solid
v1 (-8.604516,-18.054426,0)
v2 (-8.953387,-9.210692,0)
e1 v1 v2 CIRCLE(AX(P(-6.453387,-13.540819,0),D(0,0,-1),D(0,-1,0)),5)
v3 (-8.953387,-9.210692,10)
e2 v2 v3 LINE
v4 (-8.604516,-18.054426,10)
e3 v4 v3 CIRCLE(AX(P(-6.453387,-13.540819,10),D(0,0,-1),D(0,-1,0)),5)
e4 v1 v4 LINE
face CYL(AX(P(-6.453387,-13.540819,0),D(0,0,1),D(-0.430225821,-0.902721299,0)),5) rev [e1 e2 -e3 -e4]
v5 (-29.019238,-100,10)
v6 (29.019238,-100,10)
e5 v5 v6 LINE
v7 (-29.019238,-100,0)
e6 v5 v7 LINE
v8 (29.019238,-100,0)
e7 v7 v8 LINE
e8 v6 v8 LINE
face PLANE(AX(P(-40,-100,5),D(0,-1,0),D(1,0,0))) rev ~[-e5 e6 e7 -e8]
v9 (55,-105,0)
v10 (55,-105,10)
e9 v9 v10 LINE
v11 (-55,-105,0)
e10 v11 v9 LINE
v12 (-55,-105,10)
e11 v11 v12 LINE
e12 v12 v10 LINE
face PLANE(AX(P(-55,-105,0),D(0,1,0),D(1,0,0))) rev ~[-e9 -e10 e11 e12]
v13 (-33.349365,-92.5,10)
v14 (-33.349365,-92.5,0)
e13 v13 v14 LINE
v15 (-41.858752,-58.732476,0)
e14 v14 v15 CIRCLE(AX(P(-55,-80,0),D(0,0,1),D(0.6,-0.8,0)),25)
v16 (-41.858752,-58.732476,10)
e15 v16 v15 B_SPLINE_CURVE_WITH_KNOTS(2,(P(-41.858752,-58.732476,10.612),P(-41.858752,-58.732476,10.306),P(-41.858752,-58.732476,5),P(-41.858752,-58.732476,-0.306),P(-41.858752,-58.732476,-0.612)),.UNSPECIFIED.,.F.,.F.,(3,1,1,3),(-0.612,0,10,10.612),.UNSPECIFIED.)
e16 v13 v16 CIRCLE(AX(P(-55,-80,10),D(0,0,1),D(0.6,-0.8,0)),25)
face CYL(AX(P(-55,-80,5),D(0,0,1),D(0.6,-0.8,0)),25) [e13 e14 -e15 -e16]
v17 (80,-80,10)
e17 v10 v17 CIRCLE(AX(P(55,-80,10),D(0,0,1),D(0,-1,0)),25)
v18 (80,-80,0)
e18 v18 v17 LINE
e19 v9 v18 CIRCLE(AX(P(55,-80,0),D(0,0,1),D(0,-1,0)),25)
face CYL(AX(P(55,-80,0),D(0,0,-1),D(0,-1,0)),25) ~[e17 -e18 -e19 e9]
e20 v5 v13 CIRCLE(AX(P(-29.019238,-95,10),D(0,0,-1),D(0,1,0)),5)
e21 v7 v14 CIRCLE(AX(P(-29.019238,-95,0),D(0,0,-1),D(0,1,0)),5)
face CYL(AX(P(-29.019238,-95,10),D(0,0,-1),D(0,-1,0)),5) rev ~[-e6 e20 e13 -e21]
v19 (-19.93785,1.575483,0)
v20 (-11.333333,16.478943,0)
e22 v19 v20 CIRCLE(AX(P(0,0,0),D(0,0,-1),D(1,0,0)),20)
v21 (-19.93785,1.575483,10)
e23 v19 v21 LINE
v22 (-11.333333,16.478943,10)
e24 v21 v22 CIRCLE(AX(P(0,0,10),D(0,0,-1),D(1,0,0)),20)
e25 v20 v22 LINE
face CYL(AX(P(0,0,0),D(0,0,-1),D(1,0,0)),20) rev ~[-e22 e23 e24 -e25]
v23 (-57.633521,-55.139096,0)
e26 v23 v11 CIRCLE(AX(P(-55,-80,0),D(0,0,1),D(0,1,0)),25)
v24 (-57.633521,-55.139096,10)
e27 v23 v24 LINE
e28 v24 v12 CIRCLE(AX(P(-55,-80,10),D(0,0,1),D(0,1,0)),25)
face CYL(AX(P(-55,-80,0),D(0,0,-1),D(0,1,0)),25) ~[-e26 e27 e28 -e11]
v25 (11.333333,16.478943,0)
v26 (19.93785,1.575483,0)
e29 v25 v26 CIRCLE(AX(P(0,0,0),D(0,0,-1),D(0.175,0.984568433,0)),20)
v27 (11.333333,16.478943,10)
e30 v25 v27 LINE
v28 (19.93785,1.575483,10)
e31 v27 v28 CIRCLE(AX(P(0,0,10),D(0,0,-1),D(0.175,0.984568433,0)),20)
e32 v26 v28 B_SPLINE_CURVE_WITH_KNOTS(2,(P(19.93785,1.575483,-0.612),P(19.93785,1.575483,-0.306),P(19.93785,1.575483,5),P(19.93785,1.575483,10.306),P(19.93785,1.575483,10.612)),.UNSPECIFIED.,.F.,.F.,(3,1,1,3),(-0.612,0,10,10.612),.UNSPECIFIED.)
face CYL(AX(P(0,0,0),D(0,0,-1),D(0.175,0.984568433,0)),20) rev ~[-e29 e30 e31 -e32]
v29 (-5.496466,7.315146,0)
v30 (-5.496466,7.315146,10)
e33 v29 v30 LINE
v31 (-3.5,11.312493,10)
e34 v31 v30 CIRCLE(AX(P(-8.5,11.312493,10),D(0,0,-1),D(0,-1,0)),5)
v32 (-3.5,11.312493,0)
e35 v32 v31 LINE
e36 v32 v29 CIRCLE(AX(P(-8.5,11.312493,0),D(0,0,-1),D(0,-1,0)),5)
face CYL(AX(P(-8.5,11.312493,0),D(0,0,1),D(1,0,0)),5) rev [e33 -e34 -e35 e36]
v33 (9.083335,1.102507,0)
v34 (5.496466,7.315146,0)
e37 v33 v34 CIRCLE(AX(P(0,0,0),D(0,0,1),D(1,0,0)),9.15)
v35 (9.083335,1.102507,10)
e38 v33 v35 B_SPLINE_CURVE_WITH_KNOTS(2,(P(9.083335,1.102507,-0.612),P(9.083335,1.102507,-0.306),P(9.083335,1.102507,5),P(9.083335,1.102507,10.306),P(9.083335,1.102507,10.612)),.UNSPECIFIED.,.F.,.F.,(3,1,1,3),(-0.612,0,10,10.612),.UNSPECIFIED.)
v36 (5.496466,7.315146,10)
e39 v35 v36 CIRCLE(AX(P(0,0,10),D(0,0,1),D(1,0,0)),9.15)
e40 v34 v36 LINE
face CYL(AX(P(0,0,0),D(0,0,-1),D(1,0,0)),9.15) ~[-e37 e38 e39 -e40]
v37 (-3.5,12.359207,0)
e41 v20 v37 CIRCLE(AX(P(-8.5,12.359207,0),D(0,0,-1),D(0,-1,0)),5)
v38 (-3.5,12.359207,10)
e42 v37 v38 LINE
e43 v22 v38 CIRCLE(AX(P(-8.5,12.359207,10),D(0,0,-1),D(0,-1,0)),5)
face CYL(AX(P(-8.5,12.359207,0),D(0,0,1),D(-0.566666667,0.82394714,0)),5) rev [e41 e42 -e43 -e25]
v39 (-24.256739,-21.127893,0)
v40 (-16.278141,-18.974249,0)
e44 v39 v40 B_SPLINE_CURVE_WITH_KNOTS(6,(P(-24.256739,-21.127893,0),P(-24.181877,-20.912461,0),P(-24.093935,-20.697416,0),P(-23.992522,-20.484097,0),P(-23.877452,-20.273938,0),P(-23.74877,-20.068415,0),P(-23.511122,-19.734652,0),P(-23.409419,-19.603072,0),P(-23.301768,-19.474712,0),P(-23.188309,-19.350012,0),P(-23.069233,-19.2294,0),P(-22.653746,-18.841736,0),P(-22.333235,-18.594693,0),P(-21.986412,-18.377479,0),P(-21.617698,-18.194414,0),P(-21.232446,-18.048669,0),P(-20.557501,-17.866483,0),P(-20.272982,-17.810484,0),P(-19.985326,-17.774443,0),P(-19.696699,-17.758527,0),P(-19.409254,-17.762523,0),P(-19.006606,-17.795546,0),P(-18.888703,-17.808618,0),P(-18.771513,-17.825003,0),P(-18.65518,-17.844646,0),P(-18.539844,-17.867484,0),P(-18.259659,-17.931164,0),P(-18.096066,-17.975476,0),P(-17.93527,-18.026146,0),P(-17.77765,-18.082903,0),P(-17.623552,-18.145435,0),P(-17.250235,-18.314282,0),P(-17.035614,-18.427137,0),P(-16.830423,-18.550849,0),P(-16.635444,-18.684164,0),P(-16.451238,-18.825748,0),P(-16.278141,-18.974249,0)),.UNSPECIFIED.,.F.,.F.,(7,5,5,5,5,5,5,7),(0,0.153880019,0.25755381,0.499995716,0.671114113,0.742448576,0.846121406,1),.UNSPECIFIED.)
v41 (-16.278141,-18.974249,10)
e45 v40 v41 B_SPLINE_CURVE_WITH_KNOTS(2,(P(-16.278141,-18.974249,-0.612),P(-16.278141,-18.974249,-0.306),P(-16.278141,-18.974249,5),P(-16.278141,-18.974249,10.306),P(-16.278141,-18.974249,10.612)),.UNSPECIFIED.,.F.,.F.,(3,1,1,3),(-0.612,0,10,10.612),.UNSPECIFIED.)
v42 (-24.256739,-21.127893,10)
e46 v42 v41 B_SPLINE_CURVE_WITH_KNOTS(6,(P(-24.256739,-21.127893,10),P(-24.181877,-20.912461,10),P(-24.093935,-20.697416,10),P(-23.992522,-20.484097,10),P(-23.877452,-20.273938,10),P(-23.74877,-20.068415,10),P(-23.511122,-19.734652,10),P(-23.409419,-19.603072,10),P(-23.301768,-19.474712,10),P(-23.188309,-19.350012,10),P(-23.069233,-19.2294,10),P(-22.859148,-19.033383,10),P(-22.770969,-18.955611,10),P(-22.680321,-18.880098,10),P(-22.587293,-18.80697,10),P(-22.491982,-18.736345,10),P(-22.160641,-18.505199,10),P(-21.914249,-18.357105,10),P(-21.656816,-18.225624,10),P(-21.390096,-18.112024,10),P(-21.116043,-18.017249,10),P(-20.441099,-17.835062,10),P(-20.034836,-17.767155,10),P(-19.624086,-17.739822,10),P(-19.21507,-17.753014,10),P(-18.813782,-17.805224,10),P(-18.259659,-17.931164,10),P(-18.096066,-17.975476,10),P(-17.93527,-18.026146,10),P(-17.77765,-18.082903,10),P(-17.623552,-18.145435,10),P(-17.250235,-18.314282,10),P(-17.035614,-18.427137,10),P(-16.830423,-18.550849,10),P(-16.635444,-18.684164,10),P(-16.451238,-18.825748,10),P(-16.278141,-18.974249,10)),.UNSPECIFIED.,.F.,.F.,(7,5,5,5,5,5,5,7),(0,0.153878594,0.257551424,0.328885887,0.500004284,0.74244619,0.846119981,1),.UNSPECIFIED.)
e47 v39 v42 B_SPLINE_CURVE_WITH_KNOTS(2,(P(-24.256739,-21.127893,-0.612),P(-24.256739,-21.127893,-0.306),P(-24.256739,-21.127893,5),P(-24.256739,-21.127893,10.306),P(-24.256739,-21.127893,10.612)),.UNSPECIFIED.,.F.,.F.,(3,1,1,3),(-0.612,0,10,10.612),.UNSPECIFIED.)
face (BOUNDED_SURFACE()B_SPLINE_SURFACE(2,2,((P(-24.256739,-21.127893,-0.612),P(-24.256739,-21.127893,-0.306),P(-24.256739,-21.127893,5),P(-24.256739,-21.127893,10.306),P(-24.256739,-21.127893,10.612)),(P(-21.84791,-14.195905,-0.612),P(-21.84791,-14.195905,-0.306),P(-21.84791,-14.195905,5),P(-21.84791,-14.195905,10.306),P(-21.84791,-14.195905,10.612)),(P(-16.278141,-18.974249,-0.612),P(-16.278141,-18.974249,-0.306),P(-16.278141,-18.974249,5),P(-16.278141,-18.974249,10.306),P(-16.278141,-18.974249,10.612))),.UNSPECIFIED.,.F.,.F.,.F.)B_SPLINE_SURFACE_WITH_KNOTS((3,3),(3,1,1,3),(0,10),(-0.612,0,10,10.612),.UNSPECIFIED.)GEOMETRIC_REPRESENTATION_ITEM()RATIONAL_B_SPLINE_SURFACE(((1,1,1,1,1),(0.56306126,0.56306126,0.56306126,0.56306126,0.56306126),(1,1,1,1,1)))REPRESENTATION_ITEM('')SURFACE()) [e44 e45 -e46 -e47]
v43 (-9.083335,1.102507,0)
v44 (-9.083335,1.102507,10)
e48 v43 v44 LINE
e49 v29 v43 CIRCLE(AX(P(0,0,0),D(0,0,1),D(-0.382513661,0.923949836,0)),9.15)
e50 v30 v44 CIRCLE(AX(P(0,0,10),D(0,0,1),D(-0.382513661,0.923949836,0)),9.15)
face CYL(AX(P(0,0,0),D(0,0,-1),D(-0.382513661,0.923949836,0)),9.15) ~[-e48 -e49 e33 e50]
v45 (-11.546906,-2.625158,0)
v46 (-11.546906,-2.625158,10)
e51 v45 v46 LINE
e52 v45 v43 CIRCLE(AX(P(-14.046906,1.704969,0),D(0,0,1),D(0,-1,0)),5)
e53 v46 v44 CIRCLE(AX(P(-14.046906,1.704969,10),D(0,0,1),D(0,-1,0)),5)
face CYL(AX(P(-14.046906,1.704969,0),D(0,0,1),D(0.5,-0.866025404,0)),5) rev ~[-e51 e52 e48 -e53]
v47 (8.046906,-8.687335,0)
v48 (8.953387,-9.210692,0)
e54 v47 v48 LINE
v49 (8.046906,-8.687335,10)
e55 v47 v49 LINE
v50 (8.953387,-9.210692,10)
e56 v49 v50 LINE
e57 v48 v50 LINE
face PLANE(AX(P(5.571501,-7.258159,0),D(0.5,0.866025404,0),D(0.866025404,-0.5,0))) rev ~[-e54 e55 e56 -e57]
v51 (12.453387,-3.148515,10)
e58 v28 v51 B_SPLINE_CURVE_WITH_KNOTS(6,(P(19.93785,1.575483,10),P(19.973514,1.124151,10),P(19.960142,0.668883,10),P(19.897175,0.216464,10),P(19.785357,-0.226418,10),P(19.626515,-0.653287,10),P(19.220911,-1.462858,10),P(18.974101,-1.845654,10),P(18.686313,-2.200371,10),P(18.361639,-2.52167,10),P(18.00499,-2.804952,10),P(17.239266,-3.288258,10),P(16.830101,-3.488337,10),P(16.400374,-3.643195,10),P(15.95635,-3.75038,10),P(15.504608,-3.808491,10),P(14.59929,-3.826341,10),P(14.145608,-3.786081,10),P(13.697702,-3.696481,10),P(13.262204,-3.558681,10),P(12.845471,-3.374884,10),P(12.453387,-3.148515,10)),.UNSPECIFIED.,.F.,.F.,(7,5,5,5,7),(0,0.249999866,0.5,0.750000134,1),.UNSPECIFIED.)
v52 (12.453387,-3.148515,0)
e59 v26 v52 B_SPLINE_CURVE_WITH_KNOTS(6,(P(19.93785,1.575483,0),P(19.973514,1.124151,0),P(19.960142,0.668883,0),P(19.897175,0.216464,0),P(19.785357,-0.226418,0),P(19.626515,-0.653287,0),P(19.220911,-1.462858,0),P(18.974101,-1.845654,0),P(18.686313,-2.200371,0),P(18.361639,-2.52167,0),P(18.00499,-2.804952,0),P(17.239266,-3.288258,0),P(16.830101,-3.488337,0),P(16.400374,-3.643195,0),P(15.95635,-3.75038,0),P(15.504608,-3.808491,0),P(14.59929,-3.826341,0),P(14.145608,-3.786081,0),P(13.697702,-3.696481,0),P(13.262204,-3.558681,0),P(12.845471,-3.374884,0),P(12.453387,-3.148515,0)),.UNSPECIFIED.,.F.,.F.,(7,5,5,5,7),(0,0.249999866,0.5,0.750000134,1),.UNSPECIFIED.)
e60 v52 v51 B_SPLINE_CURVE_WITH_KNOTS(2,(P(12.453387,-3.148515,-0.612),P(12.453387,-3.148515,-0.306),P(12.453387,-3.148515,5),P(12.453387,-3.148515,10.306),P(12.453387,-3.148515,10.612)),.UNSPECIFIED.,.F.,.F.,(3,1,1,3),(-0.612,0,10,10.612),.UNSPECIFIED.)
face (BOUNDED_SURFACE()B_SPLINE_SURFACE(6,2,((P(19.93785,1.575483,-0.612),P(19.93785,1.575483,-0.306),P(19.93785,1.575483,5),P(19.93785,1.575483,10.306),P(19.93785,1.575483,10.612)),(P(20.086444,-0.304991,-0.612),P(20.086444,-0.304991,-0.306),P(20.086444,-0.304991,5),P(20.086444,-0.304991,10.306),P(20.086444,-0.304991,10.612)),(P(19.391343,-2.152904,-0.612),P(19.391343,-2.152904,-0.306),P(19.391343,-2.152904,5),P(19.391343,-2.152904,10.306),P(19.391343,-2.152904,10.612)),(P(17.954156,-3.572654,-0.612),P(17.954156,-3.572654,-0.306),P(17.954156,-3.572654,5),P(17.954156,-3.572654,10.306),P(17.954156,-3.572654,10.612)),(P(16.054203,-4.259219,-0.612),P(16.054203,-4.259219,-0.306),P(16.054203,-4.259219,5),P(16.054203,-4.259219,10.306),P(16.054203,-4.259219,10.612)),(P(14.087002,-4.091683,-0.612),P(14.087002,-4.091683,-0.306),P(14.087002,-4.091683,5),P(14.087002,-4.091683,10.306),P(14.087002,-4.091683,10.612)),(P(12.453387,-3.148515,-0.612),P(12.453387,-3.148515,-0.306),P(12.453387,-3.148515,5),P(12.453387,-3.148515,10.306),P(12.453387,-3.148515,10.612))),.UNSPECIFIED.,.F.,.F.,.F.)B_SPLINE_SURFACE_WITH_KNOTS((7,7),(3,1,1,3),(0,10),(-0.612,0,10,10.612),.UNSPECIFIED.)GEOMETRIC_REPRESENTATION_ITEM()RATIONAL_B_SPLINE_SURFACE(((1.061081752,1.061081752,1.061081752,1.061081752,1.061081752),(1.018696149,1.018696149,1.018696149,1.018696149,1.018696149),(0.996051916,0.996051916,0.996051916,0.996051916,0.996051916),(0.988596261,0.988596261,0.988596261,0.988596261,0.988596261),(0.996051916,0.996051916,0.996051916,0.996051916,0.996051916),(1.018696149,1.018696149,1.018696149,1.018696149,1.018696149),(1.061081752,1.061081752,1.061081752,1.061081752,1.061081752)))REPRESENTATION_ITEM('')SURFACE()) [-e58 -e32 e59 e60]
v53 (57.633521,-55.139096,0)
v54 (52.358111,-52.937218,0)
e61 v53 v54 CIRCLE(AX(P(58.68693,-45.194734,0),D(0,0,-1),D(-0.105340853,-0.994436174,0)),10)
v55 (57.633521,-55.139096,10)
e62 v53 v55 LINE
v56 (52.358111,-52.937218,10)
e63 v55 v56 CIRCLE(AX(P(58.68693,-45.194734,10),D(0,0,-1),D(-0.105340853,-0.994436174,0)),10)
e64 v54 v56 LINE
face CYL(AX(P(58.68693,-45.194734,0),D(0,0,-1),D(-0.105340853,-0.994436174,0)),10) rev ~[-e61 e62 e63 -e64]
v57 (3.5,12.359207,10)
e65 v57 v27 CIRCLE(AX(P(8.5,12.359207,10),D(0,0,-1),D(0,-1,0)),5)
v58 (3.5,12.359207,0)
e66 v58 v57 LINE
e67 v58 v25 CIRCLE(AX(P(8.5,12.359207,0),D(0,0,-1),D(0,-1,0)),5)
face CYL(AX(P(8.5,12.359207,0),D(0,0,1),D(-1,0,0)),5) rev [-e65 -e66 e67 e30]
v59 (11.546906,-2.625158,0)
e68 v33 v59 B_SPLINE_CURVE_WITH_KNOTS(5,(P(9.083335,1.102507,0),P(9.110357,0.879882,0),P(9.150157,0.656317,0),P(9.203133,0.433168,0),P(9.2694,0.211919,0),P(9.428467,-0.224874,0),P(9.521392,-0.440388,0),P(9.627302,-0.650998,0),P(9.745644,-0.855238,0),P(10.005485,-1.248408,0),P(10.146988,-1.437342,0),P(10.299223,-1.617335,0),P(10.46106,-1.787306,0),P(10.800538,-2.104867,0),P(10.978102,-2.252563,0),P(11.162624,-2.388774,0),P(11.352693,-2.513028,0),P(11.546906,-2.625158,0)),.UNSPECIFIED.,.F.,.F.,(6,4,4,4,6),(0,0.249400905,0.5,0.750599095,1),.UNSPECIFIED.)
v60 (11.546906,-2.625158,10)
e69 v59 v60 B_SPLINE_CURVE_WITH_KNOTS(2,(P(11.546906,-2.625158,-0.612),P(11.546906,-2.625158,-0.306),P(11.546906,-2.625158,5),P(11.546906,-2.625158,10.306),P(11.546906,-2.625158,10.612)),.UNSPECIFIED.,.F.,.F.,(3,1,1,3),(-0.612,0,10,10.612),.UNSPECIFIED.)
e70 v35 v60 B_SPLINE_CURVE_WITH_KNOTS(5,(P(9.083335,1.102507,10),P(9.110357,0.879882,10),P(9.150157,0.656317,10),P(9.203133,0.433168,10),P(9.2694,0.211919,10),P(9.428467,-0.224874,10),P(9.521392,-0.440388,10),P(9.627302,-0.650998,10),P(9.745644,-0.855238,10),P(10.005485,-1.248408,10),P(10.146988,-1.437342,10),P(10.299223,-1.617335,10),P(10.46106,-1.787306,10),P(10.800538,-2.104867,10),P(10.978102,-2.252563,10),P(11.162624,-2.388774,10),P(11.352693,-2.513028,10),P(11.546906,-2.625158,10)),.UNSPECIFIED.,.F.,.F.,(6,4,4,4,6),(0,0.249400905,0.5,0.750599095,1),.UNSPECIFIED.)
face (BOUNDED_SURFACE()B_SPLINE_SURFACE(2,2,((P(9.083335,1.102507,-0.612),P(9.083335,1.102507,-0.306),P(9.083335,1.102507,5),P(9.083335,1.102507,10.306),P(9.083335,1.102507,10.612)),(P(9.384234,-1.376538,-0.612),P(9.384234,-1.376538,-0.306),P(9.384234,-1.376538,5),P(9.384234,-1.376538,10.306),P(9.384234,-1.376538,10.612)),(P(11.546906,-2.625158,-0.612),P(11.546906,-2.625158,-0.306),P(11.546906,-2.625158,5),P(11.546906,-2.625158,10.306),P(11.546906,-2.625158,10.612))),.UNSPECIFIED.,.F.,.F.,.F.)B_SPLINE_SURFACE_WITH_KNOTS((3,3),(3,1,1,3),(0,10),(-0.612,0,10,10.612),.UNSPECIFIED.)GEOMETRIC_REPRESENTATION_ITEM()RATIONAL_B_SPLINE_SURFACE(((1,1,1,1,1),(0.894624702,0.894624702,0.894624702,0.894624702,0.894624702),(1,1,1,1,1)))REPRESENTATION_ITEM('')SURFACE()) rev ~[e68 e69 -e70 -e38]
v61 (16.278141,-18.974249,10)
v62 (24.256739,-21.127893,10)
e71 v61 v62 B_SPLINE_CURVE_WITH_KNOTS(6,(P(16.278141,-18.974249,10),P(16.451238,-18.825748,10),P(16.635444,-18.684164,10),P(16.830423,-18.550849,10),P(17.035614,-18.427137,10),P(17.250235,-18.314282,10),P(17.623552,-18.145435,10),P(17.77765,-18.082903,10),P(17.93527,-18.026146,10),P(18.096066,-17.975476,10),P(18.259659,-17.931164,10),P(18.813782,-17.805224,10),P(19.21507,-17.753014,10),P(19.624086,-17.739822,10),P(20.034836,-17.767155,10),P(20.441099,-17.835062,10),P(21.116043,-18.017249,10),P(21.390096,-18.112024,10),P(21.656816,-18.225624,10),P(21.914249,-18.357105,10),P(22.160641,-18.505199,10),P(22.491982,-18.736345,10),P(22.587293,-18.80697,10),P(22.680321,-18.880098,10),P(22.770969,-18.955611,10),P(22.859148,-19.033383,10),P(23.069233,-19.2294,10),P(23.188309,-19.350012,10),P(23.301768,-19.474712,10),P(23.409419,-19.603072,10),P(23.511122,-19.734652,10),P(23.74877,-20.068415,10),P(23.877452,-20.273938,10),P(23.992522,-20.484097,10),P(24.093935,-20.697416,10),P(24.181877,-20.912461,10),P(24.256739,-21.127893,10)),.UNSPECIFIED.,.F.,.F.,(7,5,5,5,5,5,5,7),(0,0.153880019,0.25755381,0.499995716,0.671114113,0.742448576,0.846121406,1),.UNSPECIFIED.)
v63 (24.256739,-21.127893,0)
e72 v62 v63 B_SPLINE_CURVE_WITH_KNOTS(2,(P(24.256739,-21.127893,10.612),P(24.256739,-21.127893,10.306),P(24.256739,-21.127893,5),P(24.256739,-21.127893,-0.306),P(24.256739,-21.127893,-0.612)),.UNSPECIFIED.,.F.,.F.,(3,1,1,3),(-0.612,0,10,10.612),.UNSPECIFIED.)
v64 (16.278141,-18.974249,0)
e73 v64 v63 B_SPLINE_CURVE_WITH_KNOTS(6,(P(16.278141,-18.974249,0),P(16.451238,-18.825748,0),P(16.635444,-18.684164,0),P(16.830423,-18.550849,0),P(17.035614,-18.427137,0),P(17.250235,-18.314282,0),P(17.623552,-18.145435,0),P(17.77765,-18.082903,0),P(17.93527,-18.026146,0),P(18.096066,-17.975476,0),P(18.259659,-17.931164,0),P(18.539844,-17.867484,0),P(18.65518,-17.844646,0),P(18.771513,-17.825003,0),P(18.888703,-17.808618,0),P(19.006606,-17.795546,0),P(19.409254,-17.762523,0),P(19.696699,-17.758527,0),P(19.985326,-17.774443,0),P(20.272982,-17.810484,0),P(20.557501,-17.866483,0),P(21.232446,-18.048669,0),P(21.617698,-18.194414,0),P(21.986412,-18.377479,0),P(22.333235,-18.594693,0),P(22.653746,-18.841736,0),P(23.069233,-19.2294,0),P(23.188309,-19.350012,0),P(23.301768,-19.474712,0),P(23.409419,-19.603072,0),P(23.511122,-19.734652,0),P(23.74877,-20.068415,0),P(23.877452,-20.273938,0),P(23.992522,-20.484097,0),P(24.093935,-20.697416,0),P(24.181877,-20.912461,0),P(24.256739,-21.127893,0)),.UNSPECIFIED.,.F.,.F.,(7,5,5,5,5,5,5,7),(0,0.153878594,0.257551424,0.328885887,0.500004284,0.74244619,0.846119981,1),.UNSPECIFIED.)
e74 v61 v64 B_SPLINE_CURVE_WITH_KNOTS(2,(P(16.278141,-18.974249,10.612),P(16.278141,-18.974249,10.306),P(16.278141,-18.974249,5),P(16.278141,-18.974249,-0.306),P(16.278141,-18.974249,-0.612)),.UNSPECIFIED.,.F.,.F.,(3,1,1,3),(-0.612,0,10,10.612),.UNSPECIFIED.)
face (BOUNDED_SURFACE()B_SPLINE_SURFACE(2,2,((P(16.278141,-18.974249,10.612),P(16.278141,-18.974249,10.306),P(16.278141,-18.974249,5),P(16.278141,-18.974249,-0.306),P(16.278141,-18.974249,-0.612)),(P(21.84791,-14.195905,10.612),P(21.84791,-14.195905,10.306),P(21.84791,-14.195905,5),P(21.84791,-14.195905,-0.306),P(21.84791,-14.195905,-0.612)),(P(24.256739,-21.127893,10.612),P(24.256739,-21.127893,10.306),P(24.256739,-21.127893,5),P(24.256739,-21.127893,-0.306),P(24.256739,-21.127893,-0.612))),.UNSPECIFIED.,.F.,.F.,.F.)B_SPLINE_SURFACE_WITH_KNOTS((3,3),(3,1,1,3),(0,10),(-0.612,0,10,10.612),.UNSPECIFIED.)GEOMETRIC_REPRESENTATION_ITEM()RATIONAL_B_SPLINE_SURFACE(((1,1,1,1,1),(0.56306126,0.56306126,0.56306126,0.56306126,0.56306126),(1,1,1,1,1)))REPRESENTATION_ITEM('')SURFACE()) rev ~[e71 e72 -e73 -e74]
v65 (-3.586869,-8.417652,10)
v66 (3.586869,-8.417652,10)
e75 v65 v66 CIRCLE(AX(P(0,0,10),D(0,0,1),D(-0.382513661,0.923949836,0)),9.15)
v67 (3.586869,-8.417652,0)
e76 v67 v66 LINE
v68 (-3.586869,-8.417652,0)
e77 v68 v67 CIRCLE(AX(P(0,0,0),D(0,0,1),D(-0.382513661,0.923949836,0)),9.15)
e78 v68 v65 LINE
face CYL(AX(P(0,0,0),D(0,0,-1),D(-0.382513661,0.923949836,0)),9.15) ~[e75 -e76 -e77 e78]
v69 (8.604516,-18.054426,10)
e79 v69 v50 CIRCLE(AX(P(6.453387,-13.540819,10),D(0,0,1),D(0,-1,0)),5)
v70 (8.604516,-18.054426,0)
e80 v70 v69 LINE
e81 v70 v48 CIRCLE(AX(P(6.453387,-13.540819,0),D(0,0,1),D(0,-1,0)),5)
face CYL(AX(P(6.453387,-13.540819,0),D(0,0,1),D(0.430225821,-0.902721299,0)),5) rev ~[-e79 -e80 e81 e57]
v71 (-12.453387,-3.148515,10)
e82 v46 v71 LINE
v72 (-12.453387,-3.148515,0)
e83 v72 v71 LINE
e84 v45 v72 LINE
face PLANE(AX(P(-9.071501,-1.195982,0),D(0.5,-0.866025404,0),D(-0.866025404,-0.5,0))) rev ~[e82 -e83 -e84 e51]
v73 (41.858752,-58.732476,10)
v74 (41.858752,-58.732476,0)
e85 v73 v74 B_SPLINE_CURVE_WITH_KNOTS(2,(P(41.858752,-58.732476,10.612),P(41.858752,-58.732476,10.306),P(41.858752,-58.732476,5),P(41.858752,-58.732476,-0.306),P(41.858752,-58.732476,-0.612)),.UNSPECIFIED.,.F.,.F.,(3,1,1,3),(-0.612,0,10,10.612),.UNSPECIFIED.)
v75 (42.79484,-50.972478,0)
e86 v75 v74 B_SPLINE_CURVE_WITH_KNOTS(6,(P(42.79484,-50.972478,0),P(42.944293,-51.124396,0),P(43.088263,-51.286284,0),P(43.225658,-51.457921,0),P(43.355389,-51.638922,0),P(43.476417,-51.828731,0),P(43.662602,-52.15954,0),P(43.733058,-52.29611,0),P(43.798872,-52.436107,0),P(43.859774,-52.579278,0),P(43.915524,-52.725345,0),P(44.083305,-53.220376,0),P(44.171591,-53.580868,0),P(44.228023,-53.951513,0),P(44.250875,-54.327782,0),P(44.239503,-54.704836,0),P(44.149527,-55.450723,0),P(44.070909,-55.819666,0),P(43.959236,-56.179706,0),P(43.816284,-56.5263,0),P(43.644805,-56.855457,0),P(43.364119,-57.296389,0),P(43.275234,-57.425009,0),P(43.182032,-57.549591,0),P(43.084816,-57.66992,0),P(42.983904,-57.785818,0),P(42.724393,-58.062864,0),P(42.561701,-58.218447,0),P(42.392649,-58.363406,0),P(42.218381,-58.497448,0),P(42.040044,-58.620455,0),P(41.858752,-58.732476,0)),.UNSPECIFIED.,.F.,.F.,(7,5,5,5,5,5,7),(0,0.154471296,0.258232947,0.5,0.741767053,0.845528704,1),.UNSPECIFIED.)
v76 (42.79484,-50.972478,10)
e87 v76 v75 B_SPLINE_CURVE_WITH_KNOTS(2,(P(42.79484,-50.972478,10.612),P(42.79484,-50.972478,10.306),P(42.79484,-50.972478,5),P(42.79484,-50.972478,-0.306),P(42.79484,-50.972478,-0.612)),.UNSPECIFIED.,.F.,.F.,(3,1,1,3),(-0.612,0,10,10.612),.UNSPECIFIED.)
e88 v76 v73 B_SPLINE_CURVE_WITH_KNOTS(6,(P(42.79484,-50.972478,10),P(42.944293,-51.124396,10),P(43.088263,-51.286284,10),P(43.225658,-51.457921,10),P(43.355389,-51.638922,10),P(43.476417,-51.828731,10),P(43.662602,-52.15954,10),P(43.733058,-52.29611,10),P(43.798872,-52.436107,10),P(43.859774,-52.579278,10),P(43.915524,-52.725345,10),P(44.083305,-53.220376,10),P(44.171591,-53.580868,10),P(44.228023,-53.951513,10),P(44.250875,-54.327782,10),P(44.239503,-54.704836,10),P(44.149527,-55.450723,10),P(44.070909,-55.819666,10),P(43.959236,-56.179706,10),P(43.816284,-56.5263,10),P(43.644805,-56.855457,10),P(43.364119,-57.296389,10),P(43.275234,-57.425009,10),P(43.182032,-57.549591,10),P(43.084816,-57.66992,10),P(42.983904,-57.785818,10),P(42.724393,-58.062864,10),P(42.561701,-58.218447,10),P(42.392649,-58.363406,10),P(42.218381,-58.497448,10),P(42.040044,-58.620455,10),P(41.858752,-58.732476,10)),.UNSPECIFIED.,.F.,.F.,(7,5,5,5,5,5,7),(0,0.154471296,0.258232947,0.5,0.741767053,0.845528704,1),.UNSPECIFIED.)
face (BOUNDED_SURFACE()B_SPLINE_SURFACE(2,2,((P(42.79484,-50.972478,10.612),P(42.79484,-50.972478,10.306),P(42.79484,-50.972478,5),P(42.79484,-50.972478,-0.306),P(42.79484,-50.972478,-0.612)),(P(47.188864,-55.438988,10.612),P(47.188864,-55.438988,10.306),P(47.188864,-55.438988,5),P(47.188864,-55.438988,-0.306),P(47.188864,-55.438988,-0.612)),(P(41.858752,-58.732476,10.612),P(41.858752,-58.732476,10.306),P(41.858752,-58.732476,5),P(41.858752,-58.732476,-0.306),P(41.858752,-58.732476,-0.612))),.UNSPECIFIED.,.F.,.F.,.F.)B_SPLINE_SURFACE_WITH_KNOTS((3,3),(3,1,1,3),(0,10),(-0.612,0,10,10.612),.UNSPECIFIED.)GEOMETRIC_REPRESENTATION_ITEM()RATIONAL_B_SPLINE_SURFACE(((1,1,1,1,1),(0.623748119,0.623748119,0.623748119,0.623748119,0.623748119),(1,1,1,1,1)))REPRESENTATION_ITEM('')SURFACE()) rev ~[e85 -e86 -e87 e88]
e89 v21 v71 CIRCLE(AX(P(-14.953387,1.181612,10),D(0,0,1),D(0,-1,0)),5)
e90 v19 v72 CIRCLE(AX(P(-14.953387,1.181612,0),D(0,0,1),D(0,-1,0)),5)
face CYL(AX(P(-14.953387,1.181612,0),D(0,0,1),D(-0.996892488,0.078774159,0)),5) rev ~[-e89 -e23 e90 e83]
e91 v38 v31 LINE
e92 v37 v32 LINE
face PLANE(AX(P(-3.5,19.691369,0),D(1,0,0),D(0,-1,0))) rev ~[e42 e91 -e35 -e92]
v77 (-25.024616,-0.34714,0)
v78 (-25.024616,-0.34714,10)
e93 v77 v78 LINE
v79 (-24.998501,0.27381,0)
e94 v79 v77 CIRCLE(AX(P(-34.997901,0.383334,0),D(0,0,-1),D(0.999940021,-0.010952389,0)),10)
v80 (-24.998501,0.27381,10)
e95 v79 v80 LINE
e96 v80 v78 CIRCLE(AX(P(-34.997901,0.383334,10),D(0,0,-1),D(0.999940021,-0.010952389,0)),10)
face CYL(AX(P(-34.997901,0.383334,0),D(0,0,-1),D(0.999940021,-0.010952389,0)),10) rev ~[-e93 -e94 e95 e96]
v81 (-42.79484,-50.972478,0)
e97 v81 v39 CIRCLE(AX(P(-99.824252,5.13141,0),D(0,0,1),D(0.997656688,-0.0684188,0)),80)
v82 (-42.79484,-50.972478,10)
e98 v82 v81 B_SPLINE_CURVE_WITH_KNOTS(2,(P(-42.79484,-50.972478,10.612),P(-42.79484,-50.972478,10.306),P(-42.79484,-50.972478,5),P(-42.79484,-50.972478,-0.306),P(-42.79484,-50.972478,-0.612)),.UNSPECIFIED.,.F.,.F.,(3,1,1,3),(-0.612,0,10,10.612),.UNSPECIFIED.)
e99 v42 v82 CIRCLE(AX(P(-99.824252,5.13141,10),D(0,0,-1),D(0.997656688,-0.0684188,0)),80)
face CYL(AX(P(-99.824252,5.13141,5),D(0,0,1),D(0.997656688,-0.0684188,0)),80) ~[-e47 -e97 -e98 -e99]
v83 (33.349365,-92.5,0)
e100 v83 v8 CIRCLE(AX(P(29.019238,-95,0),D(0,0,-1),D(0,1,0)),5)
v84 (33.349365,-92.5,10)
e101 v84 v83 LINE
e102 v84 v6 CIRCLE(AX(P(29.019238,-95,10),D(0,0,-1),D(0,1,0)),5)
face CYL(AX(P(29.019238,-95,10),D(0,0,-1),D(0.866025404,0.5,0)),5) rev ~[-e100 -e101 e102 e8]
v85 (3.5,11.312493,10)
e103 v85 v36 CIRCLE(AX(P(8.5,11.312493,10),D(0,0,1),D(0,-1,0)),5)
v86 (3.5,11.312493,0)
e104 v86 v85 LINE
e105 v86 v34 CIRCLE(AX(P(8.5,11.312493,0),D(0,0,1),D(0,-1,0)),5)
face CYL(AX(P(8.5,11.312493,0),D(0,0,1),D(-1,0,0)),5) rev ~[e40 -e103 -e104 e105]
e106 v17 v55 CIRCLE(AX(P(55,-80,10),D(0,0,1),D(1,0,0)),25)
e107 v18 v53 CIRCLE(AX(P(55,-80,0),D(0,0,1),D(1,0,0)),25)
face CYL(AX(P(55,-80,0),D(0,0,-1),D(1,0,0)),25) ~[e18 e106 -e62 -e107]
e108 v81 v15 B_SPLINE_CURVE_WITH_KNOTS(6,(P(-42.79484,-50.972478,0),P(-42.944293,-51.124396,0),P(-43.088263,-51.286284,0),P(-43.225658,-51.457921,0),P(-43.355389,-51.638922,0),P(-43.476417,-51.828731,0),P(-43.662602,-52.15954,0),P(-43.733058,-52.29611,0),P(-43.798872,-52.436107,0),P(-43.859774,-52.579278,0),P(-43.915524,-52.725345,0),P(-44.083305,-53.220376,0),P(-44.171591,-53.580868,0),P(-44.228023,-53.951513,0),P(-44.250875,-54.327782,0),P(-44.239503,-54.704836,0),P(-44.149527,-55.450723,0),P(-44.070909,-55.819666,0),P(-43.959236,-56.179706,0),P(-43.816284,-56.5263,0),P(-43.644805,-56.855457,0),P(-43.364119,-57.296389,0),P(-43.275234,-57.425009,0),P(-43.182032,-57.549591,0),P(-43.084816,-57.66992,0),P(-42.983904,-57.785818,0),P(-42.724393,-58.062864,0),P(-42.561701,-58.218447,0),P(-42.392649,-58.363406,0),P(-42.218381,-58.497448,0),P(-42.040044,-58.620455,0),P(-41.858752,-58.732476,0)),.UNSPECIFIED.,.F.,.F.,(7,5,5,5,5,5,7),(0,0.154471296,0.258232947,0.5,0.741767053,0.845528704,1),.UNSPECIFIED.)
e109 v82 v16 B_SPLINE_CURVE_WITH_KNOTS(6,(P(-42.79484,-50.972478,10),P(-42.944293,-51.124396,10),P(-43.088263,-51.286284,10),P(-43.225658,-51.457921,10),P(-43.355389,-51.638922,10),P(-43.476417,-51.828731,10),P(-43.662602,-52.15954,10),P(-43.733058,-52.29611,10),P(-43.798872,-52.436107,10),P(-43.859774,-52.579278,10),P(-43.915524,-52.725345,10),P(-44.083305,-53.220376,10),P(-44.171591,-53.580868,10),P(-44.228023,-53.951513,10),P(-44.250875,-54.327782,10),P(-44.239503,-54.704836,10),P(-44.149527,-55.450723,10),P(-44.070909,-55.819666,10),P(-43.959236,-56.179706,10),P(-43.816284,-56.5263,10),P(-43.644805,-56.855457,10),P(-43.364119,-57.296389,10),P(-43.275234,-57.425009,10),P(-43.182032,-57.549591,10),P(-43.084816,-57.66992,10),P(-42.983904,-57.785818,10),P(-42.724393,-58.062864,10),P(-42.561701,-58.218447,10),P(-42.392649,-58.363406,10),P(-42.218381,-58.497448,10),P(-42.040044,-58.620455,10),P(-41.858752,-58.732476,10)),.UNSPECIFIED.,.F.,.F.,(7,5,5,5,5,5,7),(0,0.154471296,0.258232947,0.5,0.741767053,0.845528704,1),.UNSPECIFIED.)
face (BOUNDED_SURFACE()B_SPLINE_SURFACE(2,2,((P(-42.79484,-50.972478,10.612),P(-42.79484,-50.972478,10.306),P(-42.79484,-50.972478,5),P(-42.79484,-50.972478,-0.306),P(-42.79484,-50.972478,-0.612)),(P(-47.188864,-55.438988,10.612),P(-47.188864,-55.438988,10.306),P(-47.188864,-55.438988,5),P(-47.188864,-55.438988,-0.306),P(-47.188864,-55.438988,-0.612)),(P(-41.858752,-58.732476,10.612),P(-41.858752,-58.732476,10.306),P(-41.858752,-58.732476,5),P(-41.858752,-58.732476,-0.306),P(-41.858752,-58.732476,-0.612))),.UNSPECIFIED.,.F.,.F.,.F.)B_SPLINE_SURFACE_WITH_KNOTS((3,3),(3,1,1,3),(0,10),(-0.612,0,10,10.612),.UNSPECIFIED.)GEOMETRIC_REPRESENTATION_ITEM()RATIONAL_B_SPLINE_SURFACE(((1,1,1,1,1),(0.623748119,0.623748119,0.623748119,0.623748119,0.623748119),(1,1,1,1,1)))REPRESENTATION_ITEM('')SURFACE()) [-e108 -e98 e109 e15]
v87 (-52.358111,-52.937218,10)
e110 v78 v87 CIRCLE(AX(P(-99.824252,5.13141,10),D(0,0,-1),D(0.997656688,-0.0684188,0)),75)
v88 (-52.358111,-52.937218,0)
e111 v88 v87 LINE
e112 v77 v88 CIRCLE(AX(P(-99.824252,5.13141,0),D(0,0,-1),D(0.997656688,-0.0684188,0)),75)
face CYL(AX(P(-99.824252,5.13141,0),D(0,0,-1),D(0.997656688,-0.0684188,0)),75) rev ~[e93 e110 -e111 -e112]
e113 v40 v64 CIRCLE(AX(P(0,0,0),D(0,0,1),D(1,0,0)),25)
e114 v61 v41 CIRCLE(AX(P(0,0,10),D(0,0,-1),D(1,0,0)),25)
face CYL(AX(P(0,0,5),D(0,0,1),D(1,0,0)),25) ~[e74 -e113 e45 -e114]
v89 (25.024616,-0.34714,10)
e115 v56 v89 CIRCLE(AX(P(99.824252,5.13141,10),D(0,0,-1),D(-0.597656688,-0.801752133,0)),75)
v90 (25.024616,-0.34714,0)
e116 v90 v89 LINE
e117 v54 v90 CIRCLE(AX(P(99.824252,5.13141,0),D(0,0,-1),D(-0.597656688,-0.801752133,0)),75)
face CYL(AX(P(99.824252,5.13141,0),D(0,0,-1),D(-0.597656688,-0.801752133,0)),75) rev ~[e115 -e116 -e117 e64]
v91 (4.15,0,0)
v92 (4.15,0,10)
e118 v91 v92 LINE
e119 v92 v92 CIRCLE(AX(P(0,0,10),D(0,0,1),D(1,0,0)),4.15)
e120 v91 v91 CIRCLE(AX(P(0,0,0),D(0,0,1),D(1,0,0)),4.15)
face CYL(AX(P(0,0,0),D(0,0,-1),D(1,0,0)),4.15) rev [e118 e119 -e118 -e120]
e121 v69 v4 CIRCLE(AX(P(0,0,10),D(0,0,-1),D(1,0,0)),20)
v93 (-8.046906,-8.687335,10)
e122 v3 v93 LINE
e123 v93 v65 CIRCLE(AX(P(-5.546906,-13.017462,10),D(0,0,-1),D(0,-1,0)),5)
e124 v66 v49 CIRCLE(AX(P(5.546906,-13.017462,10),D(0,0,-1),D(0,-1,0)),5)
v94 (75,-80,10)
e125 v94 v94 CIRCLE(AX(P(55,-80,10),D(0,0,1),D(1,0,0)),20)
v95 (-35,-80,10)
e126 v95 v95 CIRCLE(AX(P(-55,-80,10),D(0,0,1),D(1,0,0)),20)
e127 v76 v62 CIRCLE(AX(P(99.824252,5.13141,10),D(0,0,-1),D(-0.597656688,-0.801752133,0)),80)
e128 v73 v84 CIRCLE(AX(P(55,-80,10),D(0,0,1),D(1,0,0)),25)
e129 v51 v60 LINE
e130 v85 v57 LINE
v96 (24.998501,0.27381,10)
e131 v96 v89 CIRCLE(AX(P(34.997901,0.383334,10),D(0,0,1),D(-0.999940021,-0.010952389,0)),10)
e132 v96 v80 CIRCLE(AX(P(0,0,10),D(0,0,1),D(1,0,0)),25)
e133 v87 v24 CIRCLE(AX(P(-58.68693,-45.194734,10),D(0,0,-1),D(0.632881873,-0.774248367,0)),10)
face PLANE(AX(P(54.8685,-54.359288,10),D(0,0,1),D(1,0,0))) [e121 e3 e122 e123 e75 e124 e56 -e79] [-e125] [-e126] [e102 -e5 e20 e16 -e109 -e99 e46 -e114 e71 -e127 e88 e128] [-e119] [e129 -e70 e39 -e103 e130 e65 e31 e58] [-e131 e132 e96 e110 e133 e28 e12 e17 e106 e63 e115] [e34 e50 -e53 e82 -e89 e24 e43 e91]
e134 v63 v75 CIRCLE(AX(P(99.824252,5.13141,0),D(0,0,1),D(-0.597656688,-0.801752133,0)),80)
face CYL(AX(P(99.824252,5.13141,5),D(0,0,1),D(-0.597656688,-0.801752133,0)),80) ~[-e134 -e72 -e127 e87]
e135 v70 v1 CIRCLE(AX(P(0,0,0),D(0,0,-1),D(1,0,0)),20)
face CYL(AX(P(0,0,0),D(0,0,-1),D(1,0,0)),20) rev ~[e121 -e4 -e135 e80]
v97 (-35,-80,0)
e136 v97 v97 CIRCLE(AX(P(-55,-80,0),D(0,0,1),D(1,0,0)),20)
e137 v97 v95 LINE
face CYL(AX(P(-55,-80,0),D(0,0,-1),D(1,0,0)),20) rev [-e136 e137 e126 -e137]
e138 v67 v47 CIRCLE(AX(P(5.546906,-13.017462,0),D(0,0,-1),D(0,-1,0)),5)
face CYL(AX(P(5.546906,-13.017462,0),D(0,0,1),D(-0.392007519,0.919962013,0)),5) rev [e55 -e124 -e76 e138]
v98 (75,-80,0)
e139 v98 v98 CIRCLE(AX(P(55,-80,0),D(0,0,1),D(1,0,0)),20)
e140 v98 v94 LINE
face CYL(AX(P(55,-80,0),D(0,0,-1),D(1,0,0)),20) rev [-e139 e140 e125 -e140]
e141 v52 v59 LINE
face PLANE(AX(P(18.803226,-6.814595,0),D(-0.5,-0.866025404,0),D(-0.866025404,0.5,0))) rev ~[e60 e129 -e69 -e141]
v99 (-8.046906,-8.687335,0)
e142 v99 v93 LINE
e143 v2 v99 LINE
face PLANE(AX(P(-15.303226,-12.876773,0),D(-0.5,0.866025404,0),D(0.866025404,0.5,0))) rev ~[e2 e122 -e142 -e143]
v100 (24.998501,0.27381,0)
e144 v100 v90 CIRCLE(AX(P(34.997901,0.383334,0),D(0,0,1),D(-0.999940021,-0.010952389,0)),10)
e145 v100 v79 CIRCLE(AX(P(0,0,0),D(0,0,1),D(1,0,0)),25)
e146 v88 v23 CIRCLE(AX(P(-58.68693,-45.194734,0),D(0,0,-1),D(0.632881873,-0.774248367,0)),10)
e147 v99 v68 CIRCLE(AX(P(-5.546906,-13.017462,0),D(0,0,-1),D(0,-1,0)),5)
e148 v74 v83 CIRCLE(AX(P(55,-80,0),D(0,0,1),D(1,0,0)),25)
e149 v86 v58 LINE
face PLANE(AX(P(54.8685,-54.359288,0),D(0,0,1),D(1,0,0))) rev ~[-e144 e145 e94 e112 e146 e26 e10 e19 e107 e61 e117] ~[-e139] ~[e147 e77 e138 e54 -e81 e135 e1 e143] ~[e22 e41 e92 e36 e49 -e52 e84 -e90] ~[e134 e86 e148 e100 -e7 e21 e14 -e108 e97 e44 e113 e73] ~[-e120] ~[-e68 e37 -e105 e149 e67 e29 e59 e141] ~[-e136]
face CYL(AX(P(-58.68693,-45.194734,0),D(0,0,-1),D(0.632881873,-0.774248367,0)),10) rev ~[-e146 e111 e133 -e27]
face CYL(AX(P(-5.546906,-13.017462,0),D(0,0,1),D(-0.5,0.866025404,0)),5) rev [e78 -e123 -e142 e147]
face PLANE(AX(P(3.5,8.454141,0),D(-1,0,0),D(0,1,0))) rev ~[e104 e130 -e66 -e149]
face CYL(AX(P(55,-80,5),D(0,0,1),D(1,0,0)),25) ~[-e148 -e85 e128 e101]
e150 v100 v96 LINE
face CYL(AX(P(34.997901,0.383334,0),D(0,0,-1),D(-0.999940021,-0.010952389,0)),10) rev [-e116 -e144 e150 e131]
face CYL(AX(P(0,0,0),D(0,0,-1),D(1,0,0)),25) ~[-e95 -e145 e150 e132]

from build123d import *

# Parameters (mm, degrees)
F1_R            = 20
F2_DEPTH        = 10
F3_T            = -5
F4_DEPTH        = 5.001
F1_R_2          = 4.15
F5_DEPTH        = 10
F6_DEPTH        = 10
F6_COPIES_COUNT = 3
F9_R            = 5
F10_T1_DEPTH    = 10
F11_R           = 5


# Not quite as in the source:
# - a fillet or chamfer that OpenCascade refuses, or shapes differently, is made with other operations: its cross-section is extruded or revolved along the edge and cut away or added
# - a feature of the source that left no trace in its solid (it failed there, or was rolled back) is left out
# - a pattern or mirror of a feature is missing from the dataset's text; its kind, count and spacing are read off the source's solid


with BuildPart() as f2:
    # F1 (on Top) → F2 (new body)
    with BuildSketch(Plane.XY):
        with BuildLine():
            ThreePointArc((-25, 0), (0, -25), (25, 0))
            ThreePointArc((25, 0), (0, 25), (-25, 0))
        make_face()
        with BuildLine():
            ThreePointArc((3.5, 19.6913686675), (15.3297097168, 12.8452325787), (20, 0))
            ThreePointArc((20, 0), (-12.8452325787, -15.3297097168), (-3.5, 19.6913686675))
            ThreePointArc((-3.5, 19.6913686675), (0, 20), (3.5, 19.6913686675))
        make_face(mode=Mode.SUBTRACT)
        with BuildLine():
            ThreePointArc((55, -55), (33.982083659, -30.7824998224), (25, 0))
            ThreePointArc((25, 0), (0, -25), (-25, 0))
            ThreePointArc((-25, 0), (-33.982083659, -30.7824998224), (-55, -55))
            ThreePointArc((-55, -55), (-37.3223304703, -62.3223304703), (-30, -80))
            ThreePointArc((-30, -80), (-37.3223304703, -97.6776695297), (-55, -105))
            Line((-55, -105), (55, -105))
            ThreePointArc((55, -105), (30, -80), (55, -55))
        make_face()
        with BuildLine():
            ThreePointArc((80, -80), (72.6776695297, -62.3223304703), (55, -55))
            ThreePointArc((55, -55), (30, -80), (55, -105))
            ThreePointArc((55, -105), (72.6776695297, -97.6776695297), (80, -80))
        make_face()
        with Locations((55, -80)):
            Circle(F1_R, mode=Mode.SUBTRACT)
        with BuildLine():
            ThreePointArc((-30, -80), (-37.3223304703, -62.3223304703), (-55, -55))
            ThreePointArc((-55, -55), (-80, -80), (-55, -105))
            ThreePointArc((-55, -105), (-37.3223304703, -97.6776695297), (-30, -80))
        make_face()
        with Locations((-55, -80)):
            Circle(F1_R, mode=Mode.SUBTRACT)
    extrude(amount=F2_DEPTH)

    # F3
    f3_openings = [f2.faces().sort_by_distance(p)[0] for p in [
        (0, -59.438768, 10),
    ]]
    offset(amount=F3_T, openings=f3_openings)

    # F4 (cut, through all): a face of the model
    f4_faces = [f2.faces().sort_by_distance(p)[0] for p in [
        (0, -60.9945168835, 5),
    ]]
    extrude(f4_faces, amount=-F4_DEPTH, mode=Mode.SUBTRACT)



with BuildPart() as f5:
    # F1 (on Top) → F5 (new body, through all)
    with BuildSketch(Plane.XY):
        with BuildLine():
            ThreePointArc((9.15, 0), (7.6074798718, 5.0841665984), (3.5, 8.4541409972))
            ThreePointArc((3.5, 8.4541409972), (0, 9.15), (-3.5, 8.4541409972))
            ThreePointArc((-3.5, 8.4541409972), (-5.0841665984, -7.6074798718), (9.15, 0))
        make_face()
        Circle(F1_R_2, mode=Mode.SUBTRACT)
    extrude(amount=F5_DEPTH)


with BuildPart() as f2_1:
    add(f2.part)

    add(f5.part)  # F6 merges F5
    # F1 (on Top) → F6 (join, through all)
    with BuildSketch(Plane.XY):
        with BuildLine():
            Line((3.5, 8.4541409972), (3.5, 19.6913686675))
            ThreePointArc((3.5, 19.6913686675), (0, 20), (-3.5, 19.6913686675))
            Line((-3.5, 19.6913686675), (-3.5, 8.4541409972))
            ThreePointArc((-3.5, 8.4541409972), (0, 9.15), (3.5, 8.4541409972))
        make_face()
    f6 = extrude(amount=F6_DEPTH)

    # F6_copies: F6 ×3 about axis
    f6_copies_axis = Axis((0, 0, 0), (0, 0, 1))
    for i in range(1, F6_COPIES_COUNT):
        add(f6.rotate(f6_copies_axis, i * 360 / F6_COPIES_COUNT))

    # F9
    f9_edges = [f2_1.edges().sort_by_distance(p)[0] for p in [
        (3.5, 8.454141, 5),
        (3.5, 19.691369, 5),
        (-3.5, 8.454141, 5),
        (-3.5, 19.691369, 5),
    ]]
    fillet(f9_edges, radius=F9_R)

    # F10: fillet of radius 10 on 4 edges, made by hand

    # F10_s2 → F10_t1 (join)
    with BuildSketch(Plane.XY):
        with BuildLine():
            ThreePointArc((57.6335213289, -55.1390956438), (54.8351268274, -54.4231472749), (52.358111127, -52.9372175751))
            ThreePointArc((52.358111127, -52.9372175751), (53.6675306909, -53.9833691579), (55, -55))
            ThreePointArc((55, -55), (56.3185960515, -55.0347981291), (57.6335213289, -55.1390956438))
        make_face()
        with BuildLine():
            ThreePointArc((-52.358111127, -52.9372175751), (-54.8351268274, -54.4231472749), (-57.6335213289, -55.1390956438))
            ThreePointArc((-57.6335213289, -55.1390956438), (-56.3185960515, -55.0347981291), (-55, -55))
            ThreePointArc((-55, -55), (-53.6675306909, -53.9833691579), (-52.358111127, -52.9372175751))
        make_face()
        with BuildLine():
            ThreePointArc((-24.9985005196, 0.2738097395), (-25.0067330939, -0.0368678872), (-25.0246159735, -0.3471396482))
            ThreePointArc((-25.0246159735, -0.3471396482), (-25.0121066389, -0.1735841019), (-25, 0))
            ThreePointArc((-25, 0), (-24.9996251271, 0.1369069227), (-24.9985005196, 0.2738097395))
        make_face()
        with BuildLine():
            ThreePointArc((24.9985005196, 0.2738097395), (25.0067330939, -0.0368678872), (25.0246159735, -0.3471396482))
            ThreePointArc((25.0246159735, -0.3471396482), (25.0121066389, -0.1735841019), (25, 0))
            ThreePointArc((25, 0), (24.9996251271, 0.1369069227), (24.9985005196, 0.2738097395))
        make_face()
    extrude(amount=F10_T1_DEPTH)

    # F11
    f11_edges = [f2_1.edges().sort_by_distance(p)[0] for p in [
        (9.071501, -1.195982, 5),
        (18.803226, -6.814595, 5),
        (-5.571501, -7.258159, 5),
        (5.571501, -7.258159, 5),
        (15.303226, -12.876773, 5),
        (-15.303226, -12.876773, 5),
        (21.751654, -12.323374, 5),
        (48.164428, -55.952652, 5),
        (40, -100, 5),
        (-40, -100, 5),
        (-48.164428, -55.952652, 5),
        (-21.751654, -12.323374, 5),
        (-9.071501, -1.195982, 5),
        (-18.803226, -6.814595, 5),
    ]]
    fillet(f11_edges, radius=F11_R)


solid = f2_1.part
